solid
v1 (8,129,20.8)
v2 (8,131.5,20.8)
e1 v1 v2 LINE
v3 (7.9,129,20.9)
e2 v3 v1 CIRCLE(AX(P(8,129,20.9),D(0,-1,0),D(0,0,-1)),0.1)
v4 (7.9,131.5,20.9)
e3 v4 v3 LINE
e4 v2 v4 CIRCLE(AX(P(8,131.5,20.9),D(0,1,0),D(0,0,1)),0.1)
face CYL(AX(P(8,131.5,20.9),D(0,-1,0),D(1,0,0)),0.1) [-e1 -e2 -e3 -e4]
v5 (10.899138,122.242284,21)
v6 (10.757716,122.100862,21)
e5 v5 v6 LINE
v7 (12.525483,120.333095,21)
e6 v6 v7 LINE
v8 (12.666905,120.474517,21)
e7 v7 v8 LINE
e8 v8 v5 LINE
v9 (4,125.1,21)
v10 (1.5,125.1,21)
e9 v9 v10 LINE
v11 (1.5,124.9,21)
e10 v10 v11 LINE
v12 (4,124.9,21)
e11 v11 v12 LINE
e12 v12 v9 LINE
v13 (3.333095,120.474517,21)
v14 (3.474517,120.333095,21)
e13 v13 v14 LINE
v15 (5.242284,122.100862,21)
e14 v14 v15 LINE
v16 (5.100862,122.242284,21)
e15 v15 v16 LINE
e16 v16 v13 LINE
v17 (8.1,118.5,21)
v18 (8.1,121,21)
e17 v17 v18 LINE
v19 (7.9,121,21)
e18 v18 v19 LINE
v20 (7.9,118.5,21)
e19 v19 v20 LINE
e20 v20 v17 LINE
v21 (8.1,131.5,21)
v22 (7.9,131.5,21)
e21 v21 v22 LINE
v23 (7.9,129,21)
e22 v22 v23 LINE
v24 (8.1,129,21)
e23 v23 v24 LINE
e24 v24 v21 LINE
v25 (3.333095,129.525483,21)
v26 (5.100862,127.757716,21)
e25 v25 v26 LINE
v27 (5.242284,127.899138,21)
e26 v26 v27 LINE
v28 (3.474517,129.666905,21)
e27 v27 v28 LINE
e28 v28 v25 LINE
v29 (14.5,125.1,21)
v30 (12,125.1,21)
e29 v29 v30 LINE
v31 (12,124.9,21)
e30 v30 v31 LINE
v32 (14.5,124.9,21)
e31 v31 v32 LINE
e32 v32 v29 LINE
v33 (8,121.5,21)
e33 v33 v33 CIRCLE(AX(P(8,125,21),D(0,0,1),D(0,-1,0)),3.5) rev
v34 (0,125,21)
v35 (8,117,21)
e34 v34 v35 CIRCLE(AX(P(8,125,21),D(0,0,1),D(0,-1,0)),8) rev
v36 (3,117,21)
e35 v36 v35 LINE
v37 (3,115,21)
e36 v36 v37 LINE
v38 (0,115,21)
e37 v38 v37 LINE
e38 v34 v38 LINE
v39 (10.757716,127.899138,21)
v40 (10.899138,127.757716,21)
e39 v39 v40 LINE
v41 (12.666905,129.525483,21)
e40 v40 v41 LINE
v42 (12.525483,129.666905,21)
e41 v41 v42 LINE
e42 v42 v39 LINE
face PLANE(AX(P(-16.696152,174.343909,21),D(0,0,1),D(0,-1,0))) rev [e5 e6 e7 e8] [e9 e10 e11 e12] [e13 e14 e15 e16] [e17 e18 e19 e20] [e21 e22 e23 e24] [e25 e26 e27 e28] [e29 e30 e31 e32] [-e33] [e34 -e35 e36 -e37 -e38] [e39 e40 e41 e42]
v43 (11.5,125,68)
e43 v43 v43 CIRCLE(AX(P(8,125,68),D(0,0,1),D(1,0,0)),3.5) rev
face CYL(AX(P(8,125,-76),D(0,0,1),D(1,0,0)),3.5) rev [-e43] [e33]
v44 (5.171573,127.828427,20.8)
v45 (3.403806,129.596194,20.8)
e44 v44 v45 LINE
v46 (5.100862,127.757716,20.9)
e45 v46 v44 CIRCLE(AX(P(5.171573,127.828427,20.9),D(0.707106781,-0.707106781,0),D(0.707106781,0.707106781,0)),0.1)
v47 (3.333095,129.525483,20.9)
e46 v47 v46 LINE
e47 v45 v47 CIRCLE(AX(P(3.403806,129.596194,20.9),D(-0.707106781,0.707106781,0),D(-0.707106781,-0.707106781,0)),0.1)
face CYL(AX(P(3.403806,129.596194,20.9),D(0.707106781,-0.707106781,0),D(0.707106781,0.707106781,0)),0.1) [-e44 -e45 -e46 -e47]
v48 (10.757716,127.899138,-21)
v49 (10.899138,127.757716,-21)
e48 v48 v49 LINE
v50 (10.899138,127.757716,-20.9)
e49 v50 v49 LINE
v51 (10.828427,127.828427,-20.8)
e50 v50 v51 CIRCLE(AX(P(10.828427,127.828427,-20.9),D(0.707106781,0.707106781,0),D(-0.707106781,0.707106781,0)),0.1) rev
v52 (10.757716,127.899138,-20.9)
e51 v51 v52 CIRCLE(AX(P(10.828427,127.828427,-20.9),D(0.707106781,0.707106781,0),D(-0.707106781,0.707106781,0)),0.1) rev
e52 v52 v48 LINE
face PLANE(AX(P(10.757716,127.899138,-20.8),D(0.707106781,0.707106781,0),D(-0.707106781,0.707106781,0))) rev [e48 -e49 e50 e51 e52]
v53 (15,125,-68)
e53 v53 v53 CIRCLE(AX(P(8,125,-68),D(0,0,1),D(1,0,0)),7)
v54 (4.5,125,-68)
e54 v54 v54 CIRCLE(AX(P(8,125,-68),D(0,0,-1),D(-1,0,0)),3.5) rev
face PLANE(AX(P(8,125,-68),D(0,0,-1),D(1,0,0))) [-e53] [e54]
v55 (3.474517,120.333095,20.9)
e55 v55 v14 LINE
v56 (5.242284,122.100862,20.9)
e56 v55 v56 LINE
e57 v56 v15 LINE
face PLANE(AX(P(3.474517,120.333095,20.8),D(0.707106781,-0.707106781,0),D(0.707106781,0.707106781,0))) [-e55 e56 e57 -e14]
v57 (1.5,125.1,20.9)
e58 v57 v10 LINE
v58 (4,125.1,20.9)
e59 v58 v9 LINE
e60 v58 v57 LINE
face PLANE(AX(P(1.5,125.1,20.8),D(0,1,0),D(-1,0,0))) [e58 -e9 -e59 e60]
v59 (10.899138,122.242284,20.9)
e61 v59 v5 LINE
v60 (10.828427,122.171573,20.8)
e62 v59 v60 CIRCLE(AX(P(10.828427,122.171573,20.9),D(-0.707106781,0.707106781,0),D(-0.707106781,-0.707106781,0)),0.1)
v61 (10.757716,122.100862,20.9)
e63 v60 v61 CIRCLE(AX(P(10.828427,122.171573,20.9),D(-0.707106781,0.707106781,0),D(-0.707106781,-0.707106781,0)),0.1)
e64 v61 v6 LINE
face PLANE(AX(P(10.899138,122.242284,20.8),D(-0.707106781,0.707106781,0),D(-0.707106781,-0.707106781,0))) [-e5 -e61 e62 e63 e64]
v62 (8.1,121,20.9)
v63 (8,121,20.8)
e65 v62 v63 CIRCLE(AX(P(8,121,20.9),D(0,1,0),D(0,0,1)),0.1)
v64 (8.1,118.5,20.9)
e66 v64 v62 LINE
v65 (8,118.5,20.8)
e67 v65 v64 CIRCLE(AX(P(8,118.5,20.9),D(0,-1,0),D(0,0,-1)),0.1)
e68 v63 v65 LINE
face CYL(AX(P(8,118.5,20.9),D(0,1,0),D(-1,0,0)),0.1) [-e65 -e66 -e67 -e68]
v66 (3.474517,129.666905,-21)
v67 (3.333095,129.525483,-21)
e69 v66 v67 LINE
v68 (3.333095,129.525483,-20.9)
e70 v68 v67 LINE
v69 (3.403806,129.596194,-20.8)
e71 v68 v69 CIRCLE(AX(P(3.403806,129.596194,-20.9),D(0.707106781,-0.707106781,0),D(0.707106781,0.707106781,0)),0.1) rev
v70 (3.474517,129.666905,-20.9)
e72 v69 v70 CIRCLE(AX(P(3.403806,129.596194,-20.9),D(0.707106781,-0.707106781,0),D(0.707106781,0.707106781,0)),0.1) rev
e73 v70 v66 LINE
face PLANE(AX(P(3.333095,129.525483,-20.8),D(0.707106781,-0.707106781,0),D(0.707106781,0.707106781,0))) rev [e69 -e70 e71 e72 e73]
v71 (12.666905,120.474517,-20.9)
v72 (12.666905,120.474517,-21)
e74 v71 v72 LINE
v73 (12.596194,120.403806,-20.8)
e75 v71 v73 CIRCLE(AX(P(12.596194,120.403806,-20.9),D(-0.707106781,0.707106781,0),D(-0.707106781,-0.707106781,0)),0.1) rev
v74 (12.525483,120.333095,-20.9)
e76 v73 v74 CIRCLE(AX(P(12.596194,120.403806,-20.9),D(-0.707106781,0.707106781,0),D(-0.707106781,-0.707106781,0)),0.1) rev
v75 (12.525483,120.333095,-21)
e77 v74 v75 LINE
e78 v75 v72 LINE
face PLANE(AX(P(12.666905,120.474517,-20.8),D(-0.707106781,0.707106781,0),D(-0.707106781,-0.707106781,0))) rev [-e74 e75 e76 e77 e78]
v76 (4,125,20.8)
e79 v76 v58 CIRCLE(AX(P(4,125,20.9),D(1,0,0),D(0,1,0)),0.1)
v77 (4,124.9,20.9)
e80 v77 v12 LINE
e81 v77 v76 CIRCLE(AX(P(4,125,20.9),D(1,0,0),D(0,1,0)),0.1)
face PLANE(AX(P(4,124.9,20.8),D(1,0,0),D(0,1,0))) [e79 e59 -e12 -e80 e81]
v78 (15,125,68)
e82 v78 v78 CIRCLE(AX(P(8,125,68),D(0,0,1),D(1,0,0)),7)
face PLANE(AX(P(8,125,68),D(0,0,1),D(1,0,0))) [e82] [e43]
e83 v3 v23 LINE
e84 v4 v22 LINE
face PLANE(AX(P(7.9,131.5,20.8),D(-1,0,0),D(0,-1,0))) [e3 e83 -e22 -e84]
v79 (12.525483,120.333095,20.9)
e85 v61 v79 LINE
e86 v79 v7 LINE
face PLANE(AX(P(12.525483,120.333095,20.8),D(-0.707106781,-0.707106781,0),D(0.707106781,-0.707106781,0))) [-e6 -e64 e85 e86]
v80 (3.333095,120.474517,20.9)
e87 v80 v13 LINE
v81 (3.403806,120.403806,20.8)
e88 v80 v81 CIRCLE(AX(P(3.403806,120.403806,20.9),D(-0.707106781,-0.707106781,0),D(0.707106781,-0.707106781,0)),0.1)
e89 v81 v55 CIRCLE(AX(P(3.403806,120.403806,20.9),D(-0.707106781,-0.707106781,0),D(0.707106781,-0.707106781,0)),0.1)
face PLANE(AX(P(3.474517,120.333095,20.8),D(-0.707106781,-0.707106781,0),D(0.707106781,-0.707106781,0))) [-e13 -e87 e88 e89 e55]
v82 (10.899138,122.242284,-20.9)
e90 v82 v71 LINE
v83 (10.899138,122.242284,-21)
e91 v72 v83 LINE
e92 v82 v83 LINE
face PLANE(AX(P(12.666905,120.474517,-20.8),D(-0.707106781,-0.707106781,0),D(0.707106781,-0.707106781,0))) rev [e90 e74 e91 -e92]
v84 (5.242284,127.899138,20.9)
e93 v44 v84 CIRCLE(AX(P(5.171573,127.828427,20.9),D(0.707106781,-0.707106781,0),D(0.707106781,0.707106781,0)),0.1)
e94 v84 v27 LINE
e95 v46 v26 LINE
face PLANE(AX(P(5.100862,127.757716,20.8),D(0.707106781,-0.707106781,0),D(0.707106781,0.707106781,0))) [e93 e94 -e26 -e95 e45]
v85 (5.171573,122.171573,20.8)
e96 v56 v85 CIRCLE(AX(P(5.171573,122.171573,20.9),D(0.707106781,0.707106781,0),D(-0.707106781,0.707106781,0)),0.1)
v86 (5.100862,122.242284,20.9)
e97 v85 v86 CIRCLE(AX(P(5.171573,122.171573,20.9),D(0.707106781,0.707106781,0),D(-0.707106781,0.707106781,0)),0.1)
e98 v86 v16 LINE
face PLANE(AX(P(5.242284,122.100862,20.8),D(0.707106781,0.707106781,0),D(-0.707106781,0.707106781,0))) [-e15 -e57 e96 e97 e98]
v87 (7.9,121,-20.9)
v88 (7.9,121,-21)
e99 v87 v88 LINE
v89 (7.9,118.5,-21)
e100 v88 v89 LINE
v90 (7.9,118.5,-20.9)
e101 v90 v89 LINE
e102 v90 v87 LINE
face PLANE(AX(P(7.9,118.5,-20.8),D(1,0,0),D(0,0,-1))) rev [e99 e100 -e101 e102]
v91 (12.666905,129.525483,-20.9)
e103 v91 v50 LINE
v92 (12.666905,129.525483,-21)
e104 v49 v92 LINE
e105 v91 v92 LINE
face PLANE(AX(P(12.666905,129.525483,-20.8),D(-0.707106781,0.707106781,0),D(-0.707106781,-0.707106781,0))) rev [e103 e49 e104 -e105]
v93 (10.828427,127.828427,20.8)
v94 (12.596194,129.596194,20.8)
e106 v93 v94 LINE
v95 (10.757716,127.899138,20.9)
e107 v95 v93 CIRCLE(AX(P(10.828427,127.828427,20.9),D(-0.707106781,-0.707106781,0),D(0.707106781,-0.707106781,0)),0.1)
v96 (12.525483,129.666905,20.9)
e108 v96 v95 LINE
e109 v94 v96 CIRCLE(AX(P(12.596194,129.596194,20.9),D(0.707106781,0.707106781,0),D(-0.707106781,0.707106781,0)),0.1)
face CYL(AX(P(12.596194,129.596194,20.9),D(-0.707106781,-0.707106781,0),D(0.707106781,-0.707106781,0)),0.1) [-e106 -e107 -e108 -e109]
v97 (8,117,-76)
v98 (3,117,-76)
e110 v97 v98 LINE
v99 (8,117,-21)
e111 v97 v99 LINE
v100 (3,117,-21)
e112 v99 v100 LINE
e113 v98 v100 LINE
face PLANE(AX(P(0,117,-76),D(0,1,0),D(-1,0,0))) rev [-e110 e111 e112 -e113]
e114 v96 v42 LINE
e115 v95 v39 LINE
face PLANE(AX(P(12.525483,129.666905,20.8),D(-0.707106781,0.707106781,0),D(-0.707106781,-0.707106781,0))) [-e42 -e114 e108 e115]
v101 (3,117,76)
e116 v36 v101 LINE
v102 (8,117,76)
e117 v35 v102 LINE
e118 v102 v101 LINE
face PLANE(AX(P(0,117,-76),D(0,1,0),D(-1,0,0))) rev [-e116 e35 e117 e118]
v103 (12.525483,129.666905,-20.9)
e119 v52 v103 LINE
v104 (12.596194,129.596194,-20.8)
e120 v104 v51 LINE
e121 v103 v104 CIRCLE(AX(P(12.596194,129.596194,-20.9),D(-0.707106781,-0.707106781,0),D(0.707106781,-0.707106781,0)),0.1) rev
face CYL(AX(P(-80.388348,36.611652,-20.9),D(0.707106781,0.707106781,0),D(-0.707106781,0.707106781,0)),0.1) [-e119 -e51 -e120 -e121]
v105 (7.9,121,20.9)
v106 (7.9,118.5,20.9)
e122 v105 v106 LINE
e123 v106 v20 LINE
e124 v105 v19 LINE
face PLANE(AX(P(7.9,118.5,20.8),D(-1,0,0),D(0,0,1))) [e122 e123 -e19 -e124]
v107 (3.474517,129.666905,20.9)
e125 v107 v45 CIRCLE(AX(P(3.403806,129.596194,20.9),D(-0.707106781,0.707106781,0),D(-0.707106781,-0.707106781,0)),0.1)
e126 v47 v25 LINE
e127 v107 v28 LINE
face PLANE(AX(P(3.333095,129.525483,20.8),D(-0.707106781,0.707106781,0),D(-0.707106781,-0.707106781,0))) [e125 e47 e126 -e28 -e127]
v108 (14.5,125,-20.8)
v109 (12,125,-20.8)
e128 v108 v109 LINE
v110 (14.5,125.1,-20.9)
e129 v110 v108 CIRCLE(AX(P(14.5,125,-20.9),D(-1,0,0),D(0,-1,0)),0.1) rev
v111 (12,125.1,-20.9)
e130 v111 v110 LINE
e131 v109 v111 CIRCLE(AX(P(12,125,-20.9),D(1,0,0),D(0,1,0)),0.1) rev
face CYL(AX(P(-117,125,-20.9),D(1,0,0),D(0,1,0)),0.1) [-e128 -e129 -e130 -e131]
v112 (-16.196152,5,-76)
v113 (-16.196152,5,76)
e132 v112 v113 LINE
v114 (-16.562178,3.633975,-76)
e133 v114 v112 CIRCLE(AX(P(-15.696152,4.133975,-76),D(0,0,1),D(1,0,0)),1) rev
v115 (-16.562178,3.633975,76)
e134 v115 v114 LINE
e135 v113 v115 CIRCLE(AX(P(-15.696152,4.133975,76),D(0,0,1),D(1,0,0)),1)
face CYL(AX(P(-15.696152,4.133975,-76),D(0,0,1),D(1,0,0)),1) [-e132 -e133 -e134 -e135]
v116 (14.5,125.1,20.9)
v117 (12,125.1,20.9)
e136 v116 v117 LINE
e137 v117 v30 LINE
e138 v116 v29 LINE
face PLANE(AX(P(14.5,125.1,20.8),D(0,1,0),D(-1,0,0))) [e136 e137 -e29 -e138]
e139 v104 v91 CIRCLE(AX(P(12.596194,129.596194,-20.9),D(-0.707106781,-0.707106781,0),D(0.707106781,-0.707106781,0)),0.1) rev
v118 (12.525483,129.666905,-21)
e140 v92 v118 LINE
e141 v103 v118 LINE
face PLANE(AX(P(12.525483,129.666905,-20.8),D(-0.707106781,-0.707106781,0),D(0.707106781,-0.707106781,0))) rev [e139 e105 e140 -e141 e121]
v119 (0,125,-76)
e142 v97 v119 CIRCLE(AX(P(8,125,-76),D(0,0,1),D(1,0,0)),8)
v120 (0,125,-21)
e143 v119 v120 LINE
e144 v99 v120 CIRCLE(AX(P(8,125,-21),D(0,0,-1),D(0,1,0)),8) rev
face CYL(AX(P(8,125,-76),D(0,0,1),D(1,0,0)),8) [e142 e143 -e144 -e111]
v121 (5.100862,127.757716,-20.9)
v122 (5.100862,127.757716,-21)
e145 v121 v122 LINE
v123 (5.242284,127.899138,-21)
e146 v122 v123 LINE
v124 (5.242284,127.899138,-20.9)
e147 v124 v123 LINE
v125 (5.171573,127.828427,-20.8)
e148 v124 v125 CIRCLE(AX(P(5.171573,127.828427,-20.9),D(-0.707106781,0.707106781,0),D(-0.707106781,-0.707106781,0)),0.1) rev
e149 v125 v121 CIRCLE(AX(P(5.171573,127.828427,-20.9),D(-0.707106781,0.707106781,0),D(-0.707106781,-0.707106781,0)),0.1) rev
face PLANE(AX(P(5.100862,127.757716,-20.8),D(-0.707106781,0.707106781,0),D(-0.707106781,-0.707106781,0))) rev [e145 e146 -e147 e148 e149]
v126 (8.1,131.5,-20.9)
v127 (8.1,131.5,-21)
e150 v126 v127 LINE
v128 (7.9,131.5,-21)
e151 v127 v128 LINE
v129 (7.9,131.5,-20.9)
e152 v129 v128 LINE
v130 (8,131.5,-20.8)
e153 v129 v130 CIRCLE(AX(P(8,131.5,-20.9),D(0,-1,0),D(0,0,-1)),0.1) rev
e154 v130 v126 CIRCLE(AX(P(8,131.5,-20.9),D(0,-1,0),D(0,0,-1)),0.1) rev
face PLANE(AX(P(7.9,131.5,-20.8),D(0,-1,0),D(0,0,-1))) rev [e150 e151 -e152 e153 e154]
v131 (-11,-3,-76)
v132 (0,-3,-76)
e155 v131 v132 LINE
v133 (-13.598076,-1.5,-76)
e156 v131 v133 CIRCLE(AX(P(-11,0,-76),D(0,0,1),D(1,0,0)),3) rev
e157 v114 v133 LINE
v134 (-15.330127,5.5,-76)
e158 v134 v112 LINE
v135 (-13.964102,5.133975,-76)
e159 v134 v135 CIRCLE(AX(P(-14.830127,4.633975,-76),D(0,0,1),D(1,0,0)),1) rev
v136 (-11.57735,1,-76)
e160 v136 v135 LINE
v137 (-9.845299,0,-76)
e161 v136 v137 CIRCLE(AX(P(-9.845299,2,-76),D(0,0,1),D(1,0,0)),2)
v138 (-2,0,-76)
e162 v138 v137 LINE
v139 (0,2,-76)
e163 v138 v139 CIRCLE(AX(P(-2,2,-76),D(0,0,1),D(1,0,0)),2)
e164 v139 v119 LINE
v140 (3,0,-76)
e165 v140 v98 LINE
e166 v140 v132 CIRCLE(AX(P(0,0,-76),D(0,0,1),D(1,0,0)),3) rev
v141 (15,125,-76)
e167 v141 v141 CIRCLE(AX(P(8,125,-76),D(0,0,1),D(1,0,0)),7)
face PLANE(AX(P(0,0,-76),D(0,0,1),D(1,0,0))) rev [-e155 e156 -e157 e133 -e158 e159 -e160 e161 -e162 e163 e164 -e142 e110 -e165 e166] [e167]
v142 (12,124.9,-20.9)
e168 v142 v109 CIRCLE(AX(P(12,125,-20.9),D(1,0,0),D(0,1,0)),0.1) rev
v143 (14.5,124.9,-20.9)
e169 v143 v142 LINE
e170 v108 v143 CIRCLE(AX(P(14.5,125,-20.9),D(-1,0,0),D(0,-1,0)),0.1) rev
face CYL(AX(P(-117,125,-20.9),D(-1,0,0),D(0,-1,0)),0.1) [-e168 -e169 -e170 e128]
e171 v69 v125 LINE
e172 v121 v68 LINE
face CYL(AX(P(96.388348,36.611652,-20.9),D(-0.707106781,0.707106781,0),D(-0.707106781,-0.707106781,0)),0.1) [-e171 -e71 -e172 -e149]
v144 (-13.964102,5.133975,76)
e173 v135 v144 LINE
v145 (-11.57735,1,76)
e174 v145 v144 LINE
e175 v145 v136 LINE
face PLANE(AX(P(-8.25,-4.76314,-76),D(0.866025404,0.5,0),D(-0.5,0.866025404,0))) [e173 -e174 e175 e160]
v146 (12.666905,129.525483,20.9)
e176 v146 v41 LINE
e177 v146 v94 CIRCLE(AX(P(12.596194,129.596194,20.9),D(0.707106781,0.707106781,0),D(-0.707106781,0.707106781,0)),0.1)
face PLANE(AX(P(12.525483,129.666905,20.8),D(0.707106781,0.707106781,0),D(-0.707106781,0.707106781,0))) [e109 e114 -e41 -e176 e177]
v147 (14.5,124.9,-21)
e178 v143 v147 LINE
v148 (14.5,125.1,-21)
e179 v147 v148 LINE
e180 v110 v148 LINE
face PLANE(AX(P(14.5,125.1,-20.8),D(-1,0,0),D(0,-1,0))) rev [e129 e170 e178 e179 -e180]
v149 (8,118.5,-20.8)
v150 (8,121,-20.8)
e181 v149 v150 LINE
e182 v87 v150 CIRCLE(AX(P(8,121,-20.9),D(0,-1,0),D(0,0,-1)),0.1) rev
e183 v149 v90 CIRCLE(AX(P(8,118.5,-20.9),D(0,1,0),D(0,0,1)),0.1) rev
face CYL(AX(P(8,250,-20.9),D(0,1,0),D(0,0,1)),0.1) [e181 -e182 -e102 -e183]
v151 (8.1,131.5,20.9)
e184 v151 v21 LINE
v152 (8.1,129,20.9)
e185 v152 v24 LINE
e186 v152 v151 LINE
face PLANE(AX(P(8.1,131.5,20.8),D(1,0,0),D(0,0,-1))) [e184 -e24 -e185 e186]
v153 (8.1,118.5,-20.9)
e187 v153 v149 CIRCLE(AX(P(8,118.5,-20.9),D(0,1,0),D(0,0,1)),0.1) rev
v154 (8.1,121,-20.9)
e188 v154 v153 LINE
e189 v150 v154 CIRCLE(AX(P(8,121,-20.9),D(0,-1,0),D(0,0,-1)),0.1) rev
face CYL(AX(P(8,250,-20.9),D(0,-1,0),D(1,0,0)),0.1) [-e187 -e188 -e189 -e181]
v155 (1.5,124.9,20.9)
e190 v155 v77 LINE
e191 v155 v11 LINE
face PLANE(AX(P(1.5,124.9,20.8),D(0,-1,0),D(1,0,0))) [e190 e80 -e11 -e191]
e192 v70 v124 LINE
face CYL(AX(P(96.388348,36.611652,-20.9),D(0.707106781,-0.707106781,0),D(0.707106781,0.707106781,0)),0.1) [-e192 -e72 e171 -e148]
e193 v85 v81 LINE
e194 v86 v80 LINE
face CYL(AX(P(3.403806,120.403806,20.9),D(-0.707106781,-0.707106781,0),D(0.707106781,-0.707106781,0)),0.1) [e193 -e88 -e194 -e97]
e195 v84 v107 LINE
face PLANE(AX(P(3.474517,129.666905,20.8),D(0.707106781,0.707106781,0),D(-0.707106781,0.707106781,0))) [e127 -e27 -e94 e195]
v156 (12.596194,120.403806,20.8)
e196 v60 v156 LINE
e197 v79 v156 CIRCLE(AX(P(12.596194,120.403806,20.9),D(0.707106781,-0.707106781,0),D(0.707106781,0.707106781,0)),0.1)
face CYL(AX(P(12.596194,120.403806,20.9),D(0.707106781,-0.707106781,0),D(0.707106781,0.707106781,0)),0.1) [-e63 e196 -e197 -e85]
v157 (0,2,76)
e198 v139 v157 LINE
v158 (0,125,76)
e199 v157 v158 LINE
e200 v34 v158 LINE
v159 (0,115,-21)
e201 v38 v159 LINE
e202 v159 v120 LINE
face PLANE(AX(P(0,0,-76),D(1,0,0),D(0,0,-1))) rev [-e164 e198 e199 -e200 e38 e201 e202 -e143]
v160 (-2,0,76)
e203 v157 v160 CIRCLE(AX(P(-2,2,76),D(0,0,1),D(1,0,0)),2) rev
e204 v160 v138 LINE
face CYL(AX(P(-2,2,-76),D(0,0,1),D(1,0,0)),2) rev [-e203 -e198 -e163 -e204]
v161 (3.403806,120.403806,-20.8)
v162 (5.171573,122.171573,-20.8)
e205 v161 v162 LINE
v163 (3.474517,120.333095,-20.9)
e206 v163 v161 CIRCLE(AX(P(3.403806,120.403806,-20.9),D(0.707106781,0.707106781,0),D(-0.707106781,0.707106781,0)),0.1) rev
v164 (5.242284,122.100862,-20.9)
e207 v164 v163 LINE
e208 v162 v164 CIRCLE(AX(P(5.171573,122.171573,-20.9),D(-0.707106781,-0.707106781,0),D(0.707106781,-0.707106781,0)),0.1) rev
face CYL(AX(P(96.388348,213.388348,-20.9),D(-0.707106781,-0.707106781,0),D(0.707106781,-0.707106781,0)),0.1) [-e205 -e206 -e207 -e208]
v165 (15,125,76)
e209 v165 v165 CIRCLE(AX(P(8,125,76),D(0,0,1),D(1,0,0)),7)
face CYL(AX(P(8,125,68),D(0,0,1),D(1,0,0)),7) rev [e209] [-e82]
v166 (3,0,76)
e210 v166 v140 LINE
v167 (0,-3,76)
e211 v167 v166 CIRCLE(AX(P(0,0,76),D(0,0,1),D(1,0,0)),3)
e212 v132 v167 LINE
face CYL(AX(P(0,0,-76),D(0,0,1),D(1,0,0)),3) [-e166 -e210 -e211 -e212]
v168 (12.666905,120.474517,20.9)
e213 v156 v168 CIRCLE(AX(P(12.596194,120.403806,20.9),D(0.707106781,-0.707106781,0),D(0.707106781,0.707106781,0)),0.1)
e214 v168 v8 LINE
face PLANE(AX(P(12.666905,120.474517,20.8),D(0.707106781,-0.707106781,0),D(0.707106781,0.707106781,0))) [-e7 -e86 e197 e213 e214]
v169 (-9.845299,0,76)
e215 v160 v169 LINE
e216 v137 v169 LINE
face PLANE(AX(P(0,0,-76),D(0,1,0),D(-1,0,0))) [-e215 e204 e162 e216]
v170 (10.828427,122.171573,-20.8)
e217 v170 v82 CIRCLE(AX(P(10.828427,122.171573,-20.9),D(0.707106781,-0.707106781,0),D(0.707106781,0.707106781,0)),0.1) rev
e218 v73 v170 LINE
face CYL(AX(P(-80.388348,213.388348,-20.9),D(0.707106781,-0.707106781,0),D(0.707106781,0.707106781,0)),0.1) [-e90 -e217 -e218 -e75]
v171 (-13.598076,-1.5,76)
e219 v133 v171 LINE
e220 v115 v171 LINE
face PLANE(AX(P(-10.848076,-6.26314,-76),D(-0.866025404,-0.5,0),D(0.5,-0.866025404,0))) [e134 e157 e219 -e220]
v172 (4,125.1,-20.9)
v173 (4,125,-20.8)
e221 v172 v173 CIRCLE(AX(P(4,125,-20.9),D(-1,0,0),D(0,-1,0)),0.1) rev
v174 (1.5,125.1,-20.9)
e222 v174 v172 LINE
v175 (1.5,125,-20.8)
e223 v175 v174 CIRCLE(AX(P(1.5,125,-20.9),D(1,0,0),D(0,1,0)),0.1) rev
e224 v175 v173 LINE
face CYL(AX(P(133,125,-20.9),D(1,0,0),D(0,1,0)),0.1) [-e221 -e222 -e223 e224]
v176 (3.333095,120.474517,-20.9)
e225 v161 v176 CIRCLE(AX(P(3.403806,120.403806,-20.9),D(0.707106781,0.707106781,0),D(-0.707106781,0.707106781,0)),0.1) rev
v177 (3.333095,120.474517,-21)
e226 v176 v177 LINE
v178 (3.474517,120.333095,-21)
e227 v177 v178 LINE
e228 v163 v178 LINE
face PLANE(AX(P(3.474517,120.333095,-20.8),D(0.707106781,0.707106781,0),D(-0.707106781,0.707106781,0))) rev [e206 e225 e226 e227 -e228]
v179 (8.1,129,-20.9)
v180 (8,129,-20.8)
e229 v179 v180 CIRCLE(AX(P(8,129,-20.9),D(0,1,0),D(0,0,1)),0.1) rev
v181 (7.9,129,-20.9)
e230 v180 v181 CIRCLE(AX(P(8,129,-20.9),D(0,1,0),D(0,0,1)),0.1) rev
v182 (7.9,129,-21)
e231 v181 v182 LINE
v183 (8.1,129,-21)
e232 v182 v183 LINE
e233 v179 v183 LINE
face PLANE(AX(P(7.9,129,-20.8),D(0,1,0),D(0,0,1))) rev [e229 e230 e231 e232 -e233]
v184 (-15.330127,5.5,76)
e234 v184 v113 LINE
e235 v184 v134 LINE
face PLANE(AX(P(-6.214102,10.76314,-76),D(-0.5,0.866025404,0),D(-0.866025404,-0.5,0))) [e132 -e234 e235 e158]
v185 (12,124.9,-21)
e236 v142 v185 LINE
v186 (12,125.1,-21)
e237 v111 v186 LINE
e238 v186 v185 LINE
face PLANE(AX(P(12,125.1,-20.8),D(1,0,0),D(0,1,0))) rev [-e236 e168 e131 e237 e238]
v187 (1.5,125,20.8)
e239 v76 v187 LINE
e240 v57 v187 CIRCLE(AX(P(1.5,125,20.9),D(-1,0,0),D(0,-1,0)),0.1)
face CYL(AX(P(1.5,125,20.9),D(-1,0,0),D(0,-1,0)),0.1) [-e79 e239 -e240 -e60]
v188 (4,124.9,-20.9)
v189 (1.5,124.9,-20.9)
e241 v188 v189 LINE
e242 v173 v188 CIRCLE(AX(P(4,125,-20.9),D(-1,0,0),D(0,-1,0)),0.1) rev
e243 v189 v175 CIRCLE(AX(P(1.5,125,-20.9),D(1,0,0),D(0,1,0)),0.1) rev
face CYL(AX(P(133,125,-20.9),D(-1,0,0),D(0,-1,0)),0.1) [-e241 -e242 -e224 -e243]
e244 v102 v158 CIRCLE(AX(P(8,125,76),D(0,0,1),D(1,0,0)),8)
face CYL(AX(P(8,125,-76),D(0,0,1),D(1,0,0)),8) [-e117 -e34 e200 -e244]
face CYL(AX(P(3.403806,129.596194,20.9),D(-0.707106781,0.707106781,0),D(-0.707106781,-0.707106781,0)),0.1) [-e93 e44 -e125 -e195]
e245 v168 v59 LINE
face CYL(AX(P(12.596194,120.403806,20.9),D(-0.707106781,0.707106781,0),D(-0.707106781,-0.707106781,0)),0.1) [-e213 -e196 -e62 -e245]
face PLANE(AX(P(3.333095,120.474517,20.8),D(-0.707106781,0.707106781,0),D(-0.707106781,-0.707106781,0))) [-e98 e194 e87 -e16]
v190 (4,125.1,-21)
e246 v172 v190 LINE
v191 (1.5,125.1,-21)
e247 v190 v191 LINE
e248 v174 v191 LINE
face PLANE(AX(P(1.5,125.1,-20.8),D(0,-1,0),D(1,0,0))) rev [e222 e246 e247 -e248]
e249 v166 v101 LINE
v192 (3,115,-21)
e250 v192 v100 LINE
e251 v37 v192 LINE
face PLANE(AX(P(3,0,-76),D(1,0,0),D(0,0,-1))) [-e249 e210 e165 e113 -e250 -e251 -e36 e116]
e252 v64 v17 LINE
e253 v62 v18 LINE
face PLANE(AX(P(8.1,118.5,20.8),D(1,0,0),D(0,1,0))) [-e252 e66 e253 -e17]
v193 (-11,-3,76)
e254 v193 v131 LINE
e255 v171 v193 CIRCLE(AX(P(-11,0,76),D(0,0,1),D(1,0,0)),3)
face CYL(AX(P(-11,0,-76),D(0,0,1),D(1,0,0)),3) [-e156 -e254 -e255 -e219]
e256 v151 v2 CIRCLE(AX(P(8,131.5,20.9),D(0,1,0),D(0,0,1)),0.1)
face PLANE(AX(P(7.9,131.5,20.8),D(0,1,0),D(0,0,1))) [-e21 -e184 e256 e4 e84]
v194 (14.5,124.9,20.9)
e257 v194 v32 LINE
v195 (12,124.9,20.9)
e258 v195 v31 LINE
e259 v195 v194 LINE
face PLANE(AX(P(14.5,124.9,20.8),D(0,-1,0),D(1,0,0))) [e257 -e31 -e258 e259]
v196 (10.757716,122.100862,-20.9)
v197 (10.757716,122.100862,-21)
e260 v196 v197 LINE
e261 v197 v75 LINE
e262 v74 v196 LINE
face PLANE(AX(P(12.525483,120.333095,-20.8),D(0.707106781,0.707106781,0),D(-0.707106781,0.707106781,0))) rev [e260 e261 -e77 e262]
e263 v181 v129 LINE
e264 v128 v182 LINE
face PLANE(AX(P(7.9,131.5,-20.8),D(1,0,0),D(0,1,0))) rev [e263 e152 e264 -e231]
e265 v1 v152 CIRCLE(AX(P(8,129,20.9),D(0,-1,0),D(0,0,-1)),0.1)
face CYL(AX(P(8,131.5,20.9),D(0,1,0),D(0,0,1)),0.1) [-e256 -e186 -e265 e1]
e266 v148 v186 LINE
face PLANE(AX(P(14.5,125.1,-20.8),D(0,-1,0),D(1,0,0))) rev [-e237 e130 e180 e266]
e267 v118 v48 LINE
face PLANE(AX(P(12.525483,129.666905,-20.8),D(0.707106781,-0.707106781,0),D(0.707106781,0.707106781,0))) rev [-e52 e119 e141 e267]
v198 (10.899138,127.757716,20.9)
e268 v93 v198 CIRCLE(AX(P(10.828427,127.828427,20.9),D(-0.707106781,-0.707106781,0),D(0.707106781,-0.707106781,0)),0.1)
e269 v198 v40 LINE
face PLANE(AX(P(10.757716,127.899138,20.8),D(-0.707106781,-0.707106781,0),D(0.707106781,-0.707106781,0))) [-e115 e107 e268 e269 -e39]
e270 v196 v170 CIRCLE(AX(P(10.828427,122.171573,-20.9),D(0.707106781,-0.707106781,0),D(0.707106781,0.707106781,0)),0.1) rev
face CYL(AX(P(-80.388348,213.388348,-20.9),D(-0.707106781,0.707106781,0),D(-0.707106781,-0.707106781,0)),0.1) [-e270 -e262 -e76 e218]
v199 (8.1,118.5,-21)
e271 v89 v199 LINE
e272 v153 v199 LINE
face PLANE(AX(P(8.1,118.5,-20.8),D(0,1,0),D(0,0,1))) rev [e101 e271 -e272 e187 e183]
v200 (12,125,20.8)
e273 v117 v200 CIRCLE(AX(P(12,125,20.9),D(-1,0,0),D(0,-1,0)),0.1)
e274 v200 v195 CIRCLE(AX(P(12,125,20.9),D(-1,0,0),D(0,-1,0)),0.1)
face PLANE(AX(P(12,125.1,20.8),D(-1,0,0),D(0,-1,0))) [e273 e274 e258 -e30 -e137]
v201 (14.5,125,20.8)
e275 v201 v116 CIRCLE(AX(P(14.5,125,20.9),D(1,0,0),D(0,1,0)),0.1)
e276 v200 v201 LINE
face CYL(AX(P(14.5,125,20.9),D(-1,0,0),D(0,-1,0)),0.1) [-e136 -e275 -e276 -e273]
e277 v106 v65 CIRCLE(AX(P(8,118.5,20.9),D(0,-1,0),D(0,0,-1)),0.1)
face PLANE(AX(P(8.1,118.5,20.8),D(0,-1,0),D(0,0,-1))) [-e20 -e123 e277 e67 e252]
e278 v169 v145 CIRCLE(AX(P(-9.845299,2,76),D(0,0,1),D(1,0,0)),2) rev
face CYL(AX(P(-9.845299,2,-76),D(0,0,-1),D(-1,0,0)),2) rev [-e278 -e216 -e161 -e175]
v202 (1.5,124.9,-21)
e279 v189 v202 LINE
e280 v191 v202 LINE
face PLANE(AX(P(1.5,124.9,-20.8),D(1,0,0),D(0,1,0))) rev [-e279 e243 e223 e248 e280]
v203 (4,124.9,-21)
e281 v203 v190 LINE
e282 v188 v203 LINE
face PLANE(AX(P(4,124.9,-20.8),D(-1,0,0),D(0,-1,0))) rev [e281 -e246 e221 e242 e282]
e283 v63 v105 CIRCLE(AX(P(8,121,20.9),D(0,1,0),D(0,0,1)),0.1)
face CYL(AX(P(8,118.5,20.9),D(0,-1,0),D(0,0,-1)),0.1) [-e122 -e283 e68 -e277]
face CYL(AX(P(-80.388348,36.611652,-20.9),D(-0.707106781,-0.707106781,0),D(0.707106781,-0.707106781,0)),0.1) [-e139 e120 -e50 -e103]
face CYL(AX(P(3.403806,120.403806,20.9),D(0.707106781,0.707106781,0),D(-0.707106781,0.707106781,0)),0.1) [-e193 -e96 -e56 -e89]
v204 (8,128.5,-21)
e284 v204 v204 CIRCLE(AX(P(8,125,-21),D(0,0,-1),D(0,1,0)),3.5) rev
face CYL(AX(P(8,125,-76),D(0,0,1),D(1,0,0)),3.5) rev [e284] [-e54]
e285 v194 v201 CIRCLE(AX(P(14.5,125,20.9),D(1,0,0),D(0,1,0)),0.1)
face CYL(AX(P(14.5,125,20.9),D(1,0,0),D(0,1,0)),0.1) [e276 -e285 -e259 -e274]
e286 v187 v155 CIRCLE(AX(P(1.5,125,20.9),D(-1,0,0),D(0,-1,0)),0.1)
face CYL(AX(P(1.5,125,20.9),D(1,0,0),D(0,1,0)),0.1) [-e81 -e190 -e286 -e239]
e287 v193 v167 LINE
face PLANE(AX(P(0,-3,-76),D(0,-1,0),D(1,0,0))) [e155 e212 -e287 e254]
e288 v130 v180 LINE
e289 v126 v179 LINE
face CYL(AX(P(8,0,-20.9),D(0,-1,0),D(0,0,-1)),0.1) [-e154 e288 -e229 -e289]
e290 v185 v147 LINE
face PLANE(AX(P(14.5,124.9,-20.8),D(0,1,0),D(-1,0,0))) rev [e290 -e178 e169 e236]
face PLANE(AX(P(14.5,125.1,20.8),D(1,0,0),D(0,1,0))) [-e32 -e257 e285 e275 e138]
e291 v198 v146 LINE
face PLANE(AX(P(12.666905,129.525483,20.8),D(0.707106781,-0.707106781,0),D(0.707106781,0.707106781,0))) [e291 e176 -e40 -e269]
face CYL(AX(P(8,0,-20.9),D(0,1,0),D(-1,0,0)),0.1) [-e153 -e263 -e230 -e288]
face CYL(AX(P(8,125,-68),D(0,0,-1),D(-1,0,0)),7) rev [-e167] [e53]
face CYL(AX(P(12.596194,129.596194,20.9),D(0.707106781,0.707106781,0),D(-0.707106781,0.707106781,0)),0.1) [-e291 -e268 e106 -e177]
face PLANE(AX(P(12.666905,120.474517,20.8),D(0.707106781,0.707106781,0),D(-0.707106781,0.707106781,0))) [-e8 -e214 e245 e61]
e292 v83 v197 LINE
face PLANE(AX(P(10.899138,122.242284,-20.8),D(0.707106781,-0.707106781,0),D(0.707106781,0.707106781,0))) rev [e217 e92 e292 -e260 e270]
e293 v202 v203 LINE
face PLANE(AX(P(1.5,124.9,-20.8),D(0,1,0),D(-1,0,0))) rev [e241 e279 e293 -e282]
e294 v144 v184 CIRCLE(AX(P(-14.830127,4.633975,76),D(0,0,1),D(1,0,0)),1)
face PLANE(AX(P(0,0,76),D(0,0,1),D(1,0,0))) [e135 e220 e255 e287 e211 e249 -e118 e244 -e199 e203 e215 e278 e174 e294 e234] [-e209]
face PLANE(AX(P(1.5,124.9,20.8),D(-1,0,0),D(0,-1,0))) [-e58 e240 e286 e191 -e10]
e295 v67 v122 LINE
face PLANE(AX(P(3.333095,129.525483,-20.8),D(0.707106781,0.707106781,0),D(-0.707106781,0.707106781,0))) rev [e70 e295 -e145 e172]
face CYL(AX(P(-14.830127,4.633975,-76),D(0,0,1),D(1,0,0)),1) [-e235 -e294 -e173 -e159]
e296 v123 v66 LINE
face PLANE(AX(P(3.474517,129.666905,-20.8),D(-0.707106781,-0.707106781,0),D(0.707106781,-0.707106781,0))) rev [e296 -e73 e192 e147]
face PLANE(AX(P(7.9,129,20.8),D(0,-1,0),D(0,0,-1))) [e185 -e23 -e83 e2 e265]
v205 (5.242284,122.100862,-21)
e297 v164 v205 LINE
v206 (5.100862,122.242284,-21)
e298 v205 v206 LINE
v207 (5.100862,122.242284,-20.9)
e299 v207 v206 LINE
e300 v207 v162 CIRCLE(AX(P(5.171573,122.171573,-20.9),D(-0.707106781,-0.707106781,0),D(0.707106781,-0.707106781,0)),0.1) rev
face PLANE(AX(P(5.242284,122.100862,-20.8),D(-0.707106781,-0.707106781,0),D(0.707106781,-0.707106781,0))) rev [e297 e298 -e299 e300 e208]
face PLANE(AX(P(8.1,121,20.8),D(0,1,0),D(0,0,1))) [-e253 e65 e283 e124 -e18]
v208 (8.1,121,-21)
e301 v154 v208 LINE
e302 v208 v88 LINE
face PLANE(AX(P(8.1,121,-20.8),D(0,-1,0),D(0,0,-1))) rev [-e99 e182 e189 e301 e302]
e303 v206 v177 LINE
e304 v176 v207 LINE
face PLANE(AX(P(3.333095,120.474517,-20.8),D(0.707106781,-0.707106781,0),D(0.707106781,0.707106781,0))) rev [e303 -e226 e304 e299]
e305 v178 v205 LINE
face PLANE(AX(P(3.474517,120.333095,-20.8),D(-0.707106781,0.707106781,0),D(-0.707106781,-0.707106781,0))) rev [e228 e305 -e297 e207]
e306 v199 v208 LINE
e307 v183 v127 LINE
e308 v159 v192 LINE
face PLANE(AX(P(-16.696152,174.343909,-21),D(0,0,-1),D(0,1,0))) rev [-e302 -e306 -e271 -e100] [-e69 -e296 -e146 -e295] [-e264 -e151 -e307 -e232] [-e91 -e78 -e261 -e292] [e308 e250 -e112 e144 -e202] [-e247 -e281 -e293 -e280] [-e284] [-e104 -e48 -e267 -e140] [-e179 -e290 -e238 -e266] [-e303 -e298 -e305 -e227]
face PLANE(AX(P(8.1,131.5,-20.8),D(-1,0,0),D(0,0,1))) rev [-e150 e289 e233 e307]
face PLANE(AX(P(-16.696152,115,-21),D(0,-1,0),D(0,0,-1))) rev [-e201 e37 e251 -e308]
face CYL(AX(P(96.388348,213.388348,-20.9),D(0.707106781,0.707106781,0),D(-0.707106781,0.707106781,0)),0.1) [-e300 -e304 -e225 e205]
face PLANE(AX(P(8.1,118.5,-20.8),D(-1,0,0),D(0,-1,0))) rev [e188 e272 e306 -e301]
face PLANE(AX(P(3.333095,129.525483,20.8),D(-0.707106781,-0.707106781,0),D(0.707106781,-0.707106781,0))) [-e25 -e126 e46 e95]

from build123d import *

# Parameters (mm, degrees)
BOSS_EXTRUDE1_DEPTH      = 76
BOSS_EXTRUDE1_DEPTH_BACK = 76
SKETCH2_R                = 8
FILLET1_R                = 3
FILLET2_R                = 2
FILLET3_R                = 1
CUT_EXTRUDE2_DEPTH       = 155.090108397
CUT_EXTRUDE2_DEPTH_BACK  = 155.090108397
SKETCH7_R                = 3.5
SKETCH9_R                = 7
CUT_EXTRUDE3_DEPTH       = 8
CUT_EXTRUDE4_DEPTH       = 155.090108397
CUT_EXTRUDE4_DEPTH_BACK  = 155.090108397
SKETCH10_W               = 42
SKETCH10_H               = 59.343909382
SKETCH11_W               = 0.2
SKETCH11_H               = 2.5
BOSS_EXTRUDE2_DEPTH      = 0.2
FILLET4_R                = 0.1
CIRPATTERN1_COUNT        = 8
FILLET4_OF_CIRPATTERN1_R = 0.1
MIRROR2_START            = 118.5
MIRROR2_DEPTH            = 2.5
MIRROR2_START_2          = 129
MIRROR2_2_DEPTH          = 2.5
MIRROR2_START_3          = 87.545201898
MIRROR2_3_DEPTH          = 2.5
MIRROR2_START_4          = 98.045201898
MIRROR2_4_DEPTH          = 2.5
MIRROR2_START_5          = 1.5
MIRROR2_5_DEPTH          = 2.5
MIRROR2_START_6          = 12
MIRROR2_6_DEPTH          = 2.5
MIRROR2_START_7          = -89.231493399
MIRROR2_7_DEPTH          = 2.5
MIRROR2_START_8          = -78.731493399
MIRROR2_8_DEPTH          = 2.5


# Read off the part's stored shape, not the designer's step: Mirror2
with BuildPart() as part:
    # Sketch2 → Boss-Extrude1 (new, two sides: drawn at the far end of the back side and taken through both)
    with BuildSketch(Plane.XY.offset(-BOSS_EXTRUDE1_DEPTH_BACK)):
        with Locations((8, 125)):
            Circle(SKETCH2_R)
        with BuildLine():
            ThreePointArc((8, 117), (5.350470229, 117.451490744), (3, 118.755002002))
            Line((3, 118.755002002), (3, 117))
            Line((3, 117), (8, 117))
        make_face()
        with BuildLine():
            Line((0, 125), (0, 0))
            Line((0, 0), (-11, 0))
            Line((-11, 0), (-14.464101615, 6))
            Line((-14.464101615, 6), (-17.062177826, 4.5))
            Line((-17.062177826, 4.5), (-12.732050808, -3))
            Line((-12.732050808, -3), (3, -3))
            Line((3, -3), (3, 117))
            Line((3, 117), (3, 118.755002002))
            ThreePointArc((3, 118.755002002), (0.788897449, 121.535898385), (0, 125))
        make_face()
    extrude(amount=BOSS_EXTRUDE1_DEPTH + BOSS_EXTRUDE1_DEPTH_BACK)

    # Fillet1
    fillet1_edges = [part.edges().sort_by_distance(p)[0] for p in [
        (3, -3, 0),
        (-12.732050808, -3, 0),
    ]]
    fillet(fillet1_edges, radius=FILLET1_R)

    # Fillet2
    fillet2_edges = [part.edges().sort_by_distance(p)[0] for p in [
        (-11, 0, 0),
        (0, 0, 0),
    ]]
    fillet(fillet2_edges, radius=FILLET2_R)

    # Fillet3
    fillet3_edges = [part.edges().sort_by_distance(p)[0] for p in [
        (-17.062177826, 4.5, 0),
        (-14.464101615, 6, 0),
    ]]
    fillet(fillet3_edges, radius=FILLET3_R)

    # Sketch7 → Cut-Extrude2 (cut, two sides: drawn at the far end of the back side and taken through both)
    with BuildSketch(Plane.XY.offset(-CUT_EXTRUDE2_DEPTH_BACK)):
        with Locations((8, 125)):
            Circle(SKETCH7_R)
    extrude(amount=CUT_EXTRUDE2_DEPTH + CUT_EXTRUDE2_DEPTH_BACK, mode=Mode.SUBTRACT)

    # Sketch9 → Cut-Extrude3 (cut)
    with BuildSketch(Plane.XY.offset(76)):
        with Locations((8, 125)):
            Circle(SKETCH9_R)
    cut_extrude3 = extrude(amount=-CUT_EXTRUDE3_DEPTH, mode=Mode.SUBTRACT)

    # Mirror1: Cut-Extrude3 across plane
    add(cut_extrude3.mirror(Plane.XY), mode=Mode.SUBTRACT)

    # Sketch10 → Cut-Extrude4 (cut, two sides: drawn at the far end of the back side and taken through both)
    with BuildSketch(Plane(origin=(0, 0, 0), x_dir=(0, 0, -1), z_dir=(1, 0, 0)).offset(-CUT_EXTRUDE4_DEPTH_BACK)):
        with Locations((0, 144.671954691)):
            Rectangle(SKETCH10_W, SKETCH10_H)
    extrude(amount=CUT_EXTRUDE4_DEPTH + CUT_EXTRUDE4_DEPTH_BACK, mode=Mode.SUBTRACT)

    # Sketch11 → Boss-Extrude2 (add)
    with BuildSketch(Plane.XY.offset(-21)):
        with Locations((8, 130.25)):
            Rectangle(SKETCH11_W, SKETCH11_H)
    boss_extrude2 = extrude(amount=BOSS_EXTRUDE2_DEPTH)

    # Fillet4
    fillet4_edges = [part.edges().sort_by_distance(p)[0] for p in [
        (8.1, 130.25, -20.8),
        (7.9, 130.25, -20.8),
    ]]
    fillet(fillet4_edges, radius=FILLET4_R - 0.0001)  # a hair under: the kernel refuses the full size

    # CirPattern1: Boss-Extrude2 ×8 about axis
    cirpattern1_axis = Axis((8, 125, 0), (0, 0, 1))
    for i in range(1, CIRPATTERN1_COUNT):
        add(boss_extrude2.rotate(cirpattern1_axis, i * 360 / CIRPATTERN1_COUNT))

    # Fillet4 of CirPattern1
    fillet4_of_cirpattern1_edges = [part.edges().sort_by_distance(p)[0] for p in [
        (4.358400077, 128.783021279, -20.8),
        (4.216978721, 128.641599923, -20.8),
        (2.75, 125.1, -20.8),
        (2.75, 124.9, -20.8),
        (4.216978721, 121.358400077, -20.8),
        (4.358400077, 121.216978721, -20.8),
        (7.9, 119.75, -20.8),
        (8.1, 119.75, -20.8),
        (11.641599923, 121.216978721, -20.8),
        (11.783021279, 121.358400077, -20.8),
        (13.25, 124.9, -20.8),
        (13.25, 125.1, -20.8),
        (11.783021279, 128.641599923, -20.8),
        (11.641599923, 128.783021279, -20.8),
    ]]
    fillet(fillet4_of_cirpattern1_edges, radius=FILLET4_OF_CIRPATTERN1_R - 0.0001)  # a hair under: the kernel refuses the full size

    # Mirror2 outline → Mirror2 (add)
    with BuildSketch(Plane(origin=(0, 0, 0), x_dir=(1, 0, 0), z_dir=(0, 1, 0)).offset(MIRROR2_START)):
        with BuildLine():
            Line((7.9, -21), (8.1, -21))
            Line((8.1, -21), (8.1, -20.9))
            ThreePointArc((8.1, -20.9), (8.070710678, -20.829289322), (8, -20.8))
            ThreePointArc((8, -20.8), (7.929289322, -20.829289322), (7.9, -20.9))
            Line((7.9, -20.9), (7.9, -21))
        make_face()
    extrude(amount=MIRROR2_DEPTH)

    # Mirror2 2 outline → Mirror2 2 (add)
    with BuildSketch(Plane(origin=(0, 0, 0), x_dir=(1, 0, 0), z_dir=(0, 1, 0)).offset(MIRROR2_START_2)):
        with BuildLine():
            Line((7.9, -21), (8.1, -21))
            Line((8.1, -21), (8.1, -20.9))
            ThreePointArc((8.1, -20.9), (8.070710678, -20.829289322), (8, -20.8))
            ThreePointArc((8, -20.8), (7.929289322, -20.829289322), (7.9, -20.9))
            Line((7.9, -20.9), (7.9, -21))
        make_face()
    extrude(amount=MIRROR2_2_DEPTH)

    # Mirror2 3 outline → Mirror2 3 (add)
    with BuildSketch(Plane(origin=(0, 0, 0), x_dir=(0.7071067811865471, -0.707106781186548, 0), z_dir=(0.707106781186548, 0.707106781186547, 0)).offset(MIRROR2_START_3)):
        with BuildLine():
            Line((-82.831493399, -21), (-82.631493399, -21))
            Line((-82.631493399, -21), (-82.631493399, -20.9))
            ThreePointArc((-82.631493399, -20.9), (-82.660782721, -20.829289322), (-82.731493399, -20.8))
            ThreePointArc((-82.731493399, -20.8), (-82.802204077, -20.829289322), (-82.831493399, -20.9))
            Line((-82.831493399, -20.9), (-82.831493399, -21))
        make_face()
    extrude(amount=MIRROR2_3_DEPTH)

    # Mirror2 4 outline → Mirror2 4 (add)
    with BuildSketch(Plane(origin=(0, 0, 0), x_dir=(0.7071067811865471, -0.707106781186548, 0), z_dir=(0.707106781186548, 0.707106781186547, 0)).offset(MIRROR2_START_4)):
        with BuildLine():
            Line((-82.831493399, -21), (-82.631493399, -21))
            Line((-82.631493399, -21), (-82.631493399, -20.9))
            ThreePointArc((-82.631493399, -20.9), (-82.660782721, -20.829289322), (-82.731493399, -20.8))
            ThreePointArc((-82.731493399, -20.8), (-82.802204077, -20.829289322), (-82.831493399, -20.9))
            Line((-82.831493399, -20.9), (-82.831493399, -21))
        make_face()
    extrude(amount=MIRROR2_4_DEPTH)

    # Mirror2 5 outline → Mirror2 5 (add)
    with BuildSketch(Plane.YZ.offset(MIRROR2_START_5)):
        with BuildLine():
            Line((125.1, 21), (124.9, 21))
            Line((124.9, 21), (124.9, 20.9))
            ThreePointArc((124.9, 20.9), (124.929289322, 20.829289322), (125, 20.8))
            ThreePointArc((125, 20.8), (125.070710678, 20.829289322), (125.1, 20.9))
            Line((125.1, 20.9), (125.1, 21))
        make_face()
    extrude(amount=MIRROR2_5_DEPTH)

    # Mirror2 6 outline → Mirror2 6 (add)
    with BuildSketch(Plane.YZ.offset(MIRROR2_START_6)):
        with BuildLine():
            Line((125.1, 21), (124.9, 21))
            Line((124.9, 21), (124.9, 20.9))
            ThreePointArc((124.9, 20.9), (124.929289322, 20.829289322), (125, 20.8))
            ThreePointArc((125, 20.8), (125.070710678, 20.829289322), (125.1, 20.9))
            Line((125.1, 20.9), (125.1, 21))
        make_face()
    extrude(amount=MIRROR2_6_DEPTH)

    # Mirror2 7 outline → Mirror2 7 (add)
    with BuildSketch(Plane(origin=(0, 0, 0), x_dir=(0.7071067811865509, 0.707106781186544, 0), z_dir=(0.707106781186544, -0.707106781186551, 0)).offset(MIRROR2_START_7)):
        with BuildLine():
            Line((94.145201898, 21), (93.945201898, 21))
            Line((93.945201898, 21), (93.945201898, 20.9))
            ThreePointArc((93.945201898, 20.9), (93.97449122, 20.829289322), (94.045201898, 20.8))
            ThreePointArc((94.045201898, 20.8), (94.115912576, 20.829289322), (94.145201898, 20.9))
            Line((94.145201898, 20.9), (94.145201898, 21))
        make_face()
    extrude(amount=MIRROR2_7_DEPTH)

    # Mirror2 8 outline → Mirror2 8 (add)
    with BuildSketch(Plane(origin=(0, 0, 0), x_dir=(0.7071067811865509, 0.707106781186544, 0), z_dir=(0.707106781186544, -0.707106781186551, 0)).offset(MIRROR2_START_8)):
        with BuildLine():
            Line((94.145201898, 21), (93.945201898, 21))
            Line((93.945201898, 21), (93.945201898, 20.9))
            ThreePointArc((93.945201898, 20.9), (93.97449122, 20.829289322), (94.045201898, 20.8))
            ThreePointArc((94.045201898, 20.8), (94.115912576, 20.829289322), (94.145201898, 20.9))
            Line((94.145201898, 20.9), (94.145201898, 21))
        make_face()
    extrude(amount=MIRROR2_8_DEPTH)


solid = part.part
